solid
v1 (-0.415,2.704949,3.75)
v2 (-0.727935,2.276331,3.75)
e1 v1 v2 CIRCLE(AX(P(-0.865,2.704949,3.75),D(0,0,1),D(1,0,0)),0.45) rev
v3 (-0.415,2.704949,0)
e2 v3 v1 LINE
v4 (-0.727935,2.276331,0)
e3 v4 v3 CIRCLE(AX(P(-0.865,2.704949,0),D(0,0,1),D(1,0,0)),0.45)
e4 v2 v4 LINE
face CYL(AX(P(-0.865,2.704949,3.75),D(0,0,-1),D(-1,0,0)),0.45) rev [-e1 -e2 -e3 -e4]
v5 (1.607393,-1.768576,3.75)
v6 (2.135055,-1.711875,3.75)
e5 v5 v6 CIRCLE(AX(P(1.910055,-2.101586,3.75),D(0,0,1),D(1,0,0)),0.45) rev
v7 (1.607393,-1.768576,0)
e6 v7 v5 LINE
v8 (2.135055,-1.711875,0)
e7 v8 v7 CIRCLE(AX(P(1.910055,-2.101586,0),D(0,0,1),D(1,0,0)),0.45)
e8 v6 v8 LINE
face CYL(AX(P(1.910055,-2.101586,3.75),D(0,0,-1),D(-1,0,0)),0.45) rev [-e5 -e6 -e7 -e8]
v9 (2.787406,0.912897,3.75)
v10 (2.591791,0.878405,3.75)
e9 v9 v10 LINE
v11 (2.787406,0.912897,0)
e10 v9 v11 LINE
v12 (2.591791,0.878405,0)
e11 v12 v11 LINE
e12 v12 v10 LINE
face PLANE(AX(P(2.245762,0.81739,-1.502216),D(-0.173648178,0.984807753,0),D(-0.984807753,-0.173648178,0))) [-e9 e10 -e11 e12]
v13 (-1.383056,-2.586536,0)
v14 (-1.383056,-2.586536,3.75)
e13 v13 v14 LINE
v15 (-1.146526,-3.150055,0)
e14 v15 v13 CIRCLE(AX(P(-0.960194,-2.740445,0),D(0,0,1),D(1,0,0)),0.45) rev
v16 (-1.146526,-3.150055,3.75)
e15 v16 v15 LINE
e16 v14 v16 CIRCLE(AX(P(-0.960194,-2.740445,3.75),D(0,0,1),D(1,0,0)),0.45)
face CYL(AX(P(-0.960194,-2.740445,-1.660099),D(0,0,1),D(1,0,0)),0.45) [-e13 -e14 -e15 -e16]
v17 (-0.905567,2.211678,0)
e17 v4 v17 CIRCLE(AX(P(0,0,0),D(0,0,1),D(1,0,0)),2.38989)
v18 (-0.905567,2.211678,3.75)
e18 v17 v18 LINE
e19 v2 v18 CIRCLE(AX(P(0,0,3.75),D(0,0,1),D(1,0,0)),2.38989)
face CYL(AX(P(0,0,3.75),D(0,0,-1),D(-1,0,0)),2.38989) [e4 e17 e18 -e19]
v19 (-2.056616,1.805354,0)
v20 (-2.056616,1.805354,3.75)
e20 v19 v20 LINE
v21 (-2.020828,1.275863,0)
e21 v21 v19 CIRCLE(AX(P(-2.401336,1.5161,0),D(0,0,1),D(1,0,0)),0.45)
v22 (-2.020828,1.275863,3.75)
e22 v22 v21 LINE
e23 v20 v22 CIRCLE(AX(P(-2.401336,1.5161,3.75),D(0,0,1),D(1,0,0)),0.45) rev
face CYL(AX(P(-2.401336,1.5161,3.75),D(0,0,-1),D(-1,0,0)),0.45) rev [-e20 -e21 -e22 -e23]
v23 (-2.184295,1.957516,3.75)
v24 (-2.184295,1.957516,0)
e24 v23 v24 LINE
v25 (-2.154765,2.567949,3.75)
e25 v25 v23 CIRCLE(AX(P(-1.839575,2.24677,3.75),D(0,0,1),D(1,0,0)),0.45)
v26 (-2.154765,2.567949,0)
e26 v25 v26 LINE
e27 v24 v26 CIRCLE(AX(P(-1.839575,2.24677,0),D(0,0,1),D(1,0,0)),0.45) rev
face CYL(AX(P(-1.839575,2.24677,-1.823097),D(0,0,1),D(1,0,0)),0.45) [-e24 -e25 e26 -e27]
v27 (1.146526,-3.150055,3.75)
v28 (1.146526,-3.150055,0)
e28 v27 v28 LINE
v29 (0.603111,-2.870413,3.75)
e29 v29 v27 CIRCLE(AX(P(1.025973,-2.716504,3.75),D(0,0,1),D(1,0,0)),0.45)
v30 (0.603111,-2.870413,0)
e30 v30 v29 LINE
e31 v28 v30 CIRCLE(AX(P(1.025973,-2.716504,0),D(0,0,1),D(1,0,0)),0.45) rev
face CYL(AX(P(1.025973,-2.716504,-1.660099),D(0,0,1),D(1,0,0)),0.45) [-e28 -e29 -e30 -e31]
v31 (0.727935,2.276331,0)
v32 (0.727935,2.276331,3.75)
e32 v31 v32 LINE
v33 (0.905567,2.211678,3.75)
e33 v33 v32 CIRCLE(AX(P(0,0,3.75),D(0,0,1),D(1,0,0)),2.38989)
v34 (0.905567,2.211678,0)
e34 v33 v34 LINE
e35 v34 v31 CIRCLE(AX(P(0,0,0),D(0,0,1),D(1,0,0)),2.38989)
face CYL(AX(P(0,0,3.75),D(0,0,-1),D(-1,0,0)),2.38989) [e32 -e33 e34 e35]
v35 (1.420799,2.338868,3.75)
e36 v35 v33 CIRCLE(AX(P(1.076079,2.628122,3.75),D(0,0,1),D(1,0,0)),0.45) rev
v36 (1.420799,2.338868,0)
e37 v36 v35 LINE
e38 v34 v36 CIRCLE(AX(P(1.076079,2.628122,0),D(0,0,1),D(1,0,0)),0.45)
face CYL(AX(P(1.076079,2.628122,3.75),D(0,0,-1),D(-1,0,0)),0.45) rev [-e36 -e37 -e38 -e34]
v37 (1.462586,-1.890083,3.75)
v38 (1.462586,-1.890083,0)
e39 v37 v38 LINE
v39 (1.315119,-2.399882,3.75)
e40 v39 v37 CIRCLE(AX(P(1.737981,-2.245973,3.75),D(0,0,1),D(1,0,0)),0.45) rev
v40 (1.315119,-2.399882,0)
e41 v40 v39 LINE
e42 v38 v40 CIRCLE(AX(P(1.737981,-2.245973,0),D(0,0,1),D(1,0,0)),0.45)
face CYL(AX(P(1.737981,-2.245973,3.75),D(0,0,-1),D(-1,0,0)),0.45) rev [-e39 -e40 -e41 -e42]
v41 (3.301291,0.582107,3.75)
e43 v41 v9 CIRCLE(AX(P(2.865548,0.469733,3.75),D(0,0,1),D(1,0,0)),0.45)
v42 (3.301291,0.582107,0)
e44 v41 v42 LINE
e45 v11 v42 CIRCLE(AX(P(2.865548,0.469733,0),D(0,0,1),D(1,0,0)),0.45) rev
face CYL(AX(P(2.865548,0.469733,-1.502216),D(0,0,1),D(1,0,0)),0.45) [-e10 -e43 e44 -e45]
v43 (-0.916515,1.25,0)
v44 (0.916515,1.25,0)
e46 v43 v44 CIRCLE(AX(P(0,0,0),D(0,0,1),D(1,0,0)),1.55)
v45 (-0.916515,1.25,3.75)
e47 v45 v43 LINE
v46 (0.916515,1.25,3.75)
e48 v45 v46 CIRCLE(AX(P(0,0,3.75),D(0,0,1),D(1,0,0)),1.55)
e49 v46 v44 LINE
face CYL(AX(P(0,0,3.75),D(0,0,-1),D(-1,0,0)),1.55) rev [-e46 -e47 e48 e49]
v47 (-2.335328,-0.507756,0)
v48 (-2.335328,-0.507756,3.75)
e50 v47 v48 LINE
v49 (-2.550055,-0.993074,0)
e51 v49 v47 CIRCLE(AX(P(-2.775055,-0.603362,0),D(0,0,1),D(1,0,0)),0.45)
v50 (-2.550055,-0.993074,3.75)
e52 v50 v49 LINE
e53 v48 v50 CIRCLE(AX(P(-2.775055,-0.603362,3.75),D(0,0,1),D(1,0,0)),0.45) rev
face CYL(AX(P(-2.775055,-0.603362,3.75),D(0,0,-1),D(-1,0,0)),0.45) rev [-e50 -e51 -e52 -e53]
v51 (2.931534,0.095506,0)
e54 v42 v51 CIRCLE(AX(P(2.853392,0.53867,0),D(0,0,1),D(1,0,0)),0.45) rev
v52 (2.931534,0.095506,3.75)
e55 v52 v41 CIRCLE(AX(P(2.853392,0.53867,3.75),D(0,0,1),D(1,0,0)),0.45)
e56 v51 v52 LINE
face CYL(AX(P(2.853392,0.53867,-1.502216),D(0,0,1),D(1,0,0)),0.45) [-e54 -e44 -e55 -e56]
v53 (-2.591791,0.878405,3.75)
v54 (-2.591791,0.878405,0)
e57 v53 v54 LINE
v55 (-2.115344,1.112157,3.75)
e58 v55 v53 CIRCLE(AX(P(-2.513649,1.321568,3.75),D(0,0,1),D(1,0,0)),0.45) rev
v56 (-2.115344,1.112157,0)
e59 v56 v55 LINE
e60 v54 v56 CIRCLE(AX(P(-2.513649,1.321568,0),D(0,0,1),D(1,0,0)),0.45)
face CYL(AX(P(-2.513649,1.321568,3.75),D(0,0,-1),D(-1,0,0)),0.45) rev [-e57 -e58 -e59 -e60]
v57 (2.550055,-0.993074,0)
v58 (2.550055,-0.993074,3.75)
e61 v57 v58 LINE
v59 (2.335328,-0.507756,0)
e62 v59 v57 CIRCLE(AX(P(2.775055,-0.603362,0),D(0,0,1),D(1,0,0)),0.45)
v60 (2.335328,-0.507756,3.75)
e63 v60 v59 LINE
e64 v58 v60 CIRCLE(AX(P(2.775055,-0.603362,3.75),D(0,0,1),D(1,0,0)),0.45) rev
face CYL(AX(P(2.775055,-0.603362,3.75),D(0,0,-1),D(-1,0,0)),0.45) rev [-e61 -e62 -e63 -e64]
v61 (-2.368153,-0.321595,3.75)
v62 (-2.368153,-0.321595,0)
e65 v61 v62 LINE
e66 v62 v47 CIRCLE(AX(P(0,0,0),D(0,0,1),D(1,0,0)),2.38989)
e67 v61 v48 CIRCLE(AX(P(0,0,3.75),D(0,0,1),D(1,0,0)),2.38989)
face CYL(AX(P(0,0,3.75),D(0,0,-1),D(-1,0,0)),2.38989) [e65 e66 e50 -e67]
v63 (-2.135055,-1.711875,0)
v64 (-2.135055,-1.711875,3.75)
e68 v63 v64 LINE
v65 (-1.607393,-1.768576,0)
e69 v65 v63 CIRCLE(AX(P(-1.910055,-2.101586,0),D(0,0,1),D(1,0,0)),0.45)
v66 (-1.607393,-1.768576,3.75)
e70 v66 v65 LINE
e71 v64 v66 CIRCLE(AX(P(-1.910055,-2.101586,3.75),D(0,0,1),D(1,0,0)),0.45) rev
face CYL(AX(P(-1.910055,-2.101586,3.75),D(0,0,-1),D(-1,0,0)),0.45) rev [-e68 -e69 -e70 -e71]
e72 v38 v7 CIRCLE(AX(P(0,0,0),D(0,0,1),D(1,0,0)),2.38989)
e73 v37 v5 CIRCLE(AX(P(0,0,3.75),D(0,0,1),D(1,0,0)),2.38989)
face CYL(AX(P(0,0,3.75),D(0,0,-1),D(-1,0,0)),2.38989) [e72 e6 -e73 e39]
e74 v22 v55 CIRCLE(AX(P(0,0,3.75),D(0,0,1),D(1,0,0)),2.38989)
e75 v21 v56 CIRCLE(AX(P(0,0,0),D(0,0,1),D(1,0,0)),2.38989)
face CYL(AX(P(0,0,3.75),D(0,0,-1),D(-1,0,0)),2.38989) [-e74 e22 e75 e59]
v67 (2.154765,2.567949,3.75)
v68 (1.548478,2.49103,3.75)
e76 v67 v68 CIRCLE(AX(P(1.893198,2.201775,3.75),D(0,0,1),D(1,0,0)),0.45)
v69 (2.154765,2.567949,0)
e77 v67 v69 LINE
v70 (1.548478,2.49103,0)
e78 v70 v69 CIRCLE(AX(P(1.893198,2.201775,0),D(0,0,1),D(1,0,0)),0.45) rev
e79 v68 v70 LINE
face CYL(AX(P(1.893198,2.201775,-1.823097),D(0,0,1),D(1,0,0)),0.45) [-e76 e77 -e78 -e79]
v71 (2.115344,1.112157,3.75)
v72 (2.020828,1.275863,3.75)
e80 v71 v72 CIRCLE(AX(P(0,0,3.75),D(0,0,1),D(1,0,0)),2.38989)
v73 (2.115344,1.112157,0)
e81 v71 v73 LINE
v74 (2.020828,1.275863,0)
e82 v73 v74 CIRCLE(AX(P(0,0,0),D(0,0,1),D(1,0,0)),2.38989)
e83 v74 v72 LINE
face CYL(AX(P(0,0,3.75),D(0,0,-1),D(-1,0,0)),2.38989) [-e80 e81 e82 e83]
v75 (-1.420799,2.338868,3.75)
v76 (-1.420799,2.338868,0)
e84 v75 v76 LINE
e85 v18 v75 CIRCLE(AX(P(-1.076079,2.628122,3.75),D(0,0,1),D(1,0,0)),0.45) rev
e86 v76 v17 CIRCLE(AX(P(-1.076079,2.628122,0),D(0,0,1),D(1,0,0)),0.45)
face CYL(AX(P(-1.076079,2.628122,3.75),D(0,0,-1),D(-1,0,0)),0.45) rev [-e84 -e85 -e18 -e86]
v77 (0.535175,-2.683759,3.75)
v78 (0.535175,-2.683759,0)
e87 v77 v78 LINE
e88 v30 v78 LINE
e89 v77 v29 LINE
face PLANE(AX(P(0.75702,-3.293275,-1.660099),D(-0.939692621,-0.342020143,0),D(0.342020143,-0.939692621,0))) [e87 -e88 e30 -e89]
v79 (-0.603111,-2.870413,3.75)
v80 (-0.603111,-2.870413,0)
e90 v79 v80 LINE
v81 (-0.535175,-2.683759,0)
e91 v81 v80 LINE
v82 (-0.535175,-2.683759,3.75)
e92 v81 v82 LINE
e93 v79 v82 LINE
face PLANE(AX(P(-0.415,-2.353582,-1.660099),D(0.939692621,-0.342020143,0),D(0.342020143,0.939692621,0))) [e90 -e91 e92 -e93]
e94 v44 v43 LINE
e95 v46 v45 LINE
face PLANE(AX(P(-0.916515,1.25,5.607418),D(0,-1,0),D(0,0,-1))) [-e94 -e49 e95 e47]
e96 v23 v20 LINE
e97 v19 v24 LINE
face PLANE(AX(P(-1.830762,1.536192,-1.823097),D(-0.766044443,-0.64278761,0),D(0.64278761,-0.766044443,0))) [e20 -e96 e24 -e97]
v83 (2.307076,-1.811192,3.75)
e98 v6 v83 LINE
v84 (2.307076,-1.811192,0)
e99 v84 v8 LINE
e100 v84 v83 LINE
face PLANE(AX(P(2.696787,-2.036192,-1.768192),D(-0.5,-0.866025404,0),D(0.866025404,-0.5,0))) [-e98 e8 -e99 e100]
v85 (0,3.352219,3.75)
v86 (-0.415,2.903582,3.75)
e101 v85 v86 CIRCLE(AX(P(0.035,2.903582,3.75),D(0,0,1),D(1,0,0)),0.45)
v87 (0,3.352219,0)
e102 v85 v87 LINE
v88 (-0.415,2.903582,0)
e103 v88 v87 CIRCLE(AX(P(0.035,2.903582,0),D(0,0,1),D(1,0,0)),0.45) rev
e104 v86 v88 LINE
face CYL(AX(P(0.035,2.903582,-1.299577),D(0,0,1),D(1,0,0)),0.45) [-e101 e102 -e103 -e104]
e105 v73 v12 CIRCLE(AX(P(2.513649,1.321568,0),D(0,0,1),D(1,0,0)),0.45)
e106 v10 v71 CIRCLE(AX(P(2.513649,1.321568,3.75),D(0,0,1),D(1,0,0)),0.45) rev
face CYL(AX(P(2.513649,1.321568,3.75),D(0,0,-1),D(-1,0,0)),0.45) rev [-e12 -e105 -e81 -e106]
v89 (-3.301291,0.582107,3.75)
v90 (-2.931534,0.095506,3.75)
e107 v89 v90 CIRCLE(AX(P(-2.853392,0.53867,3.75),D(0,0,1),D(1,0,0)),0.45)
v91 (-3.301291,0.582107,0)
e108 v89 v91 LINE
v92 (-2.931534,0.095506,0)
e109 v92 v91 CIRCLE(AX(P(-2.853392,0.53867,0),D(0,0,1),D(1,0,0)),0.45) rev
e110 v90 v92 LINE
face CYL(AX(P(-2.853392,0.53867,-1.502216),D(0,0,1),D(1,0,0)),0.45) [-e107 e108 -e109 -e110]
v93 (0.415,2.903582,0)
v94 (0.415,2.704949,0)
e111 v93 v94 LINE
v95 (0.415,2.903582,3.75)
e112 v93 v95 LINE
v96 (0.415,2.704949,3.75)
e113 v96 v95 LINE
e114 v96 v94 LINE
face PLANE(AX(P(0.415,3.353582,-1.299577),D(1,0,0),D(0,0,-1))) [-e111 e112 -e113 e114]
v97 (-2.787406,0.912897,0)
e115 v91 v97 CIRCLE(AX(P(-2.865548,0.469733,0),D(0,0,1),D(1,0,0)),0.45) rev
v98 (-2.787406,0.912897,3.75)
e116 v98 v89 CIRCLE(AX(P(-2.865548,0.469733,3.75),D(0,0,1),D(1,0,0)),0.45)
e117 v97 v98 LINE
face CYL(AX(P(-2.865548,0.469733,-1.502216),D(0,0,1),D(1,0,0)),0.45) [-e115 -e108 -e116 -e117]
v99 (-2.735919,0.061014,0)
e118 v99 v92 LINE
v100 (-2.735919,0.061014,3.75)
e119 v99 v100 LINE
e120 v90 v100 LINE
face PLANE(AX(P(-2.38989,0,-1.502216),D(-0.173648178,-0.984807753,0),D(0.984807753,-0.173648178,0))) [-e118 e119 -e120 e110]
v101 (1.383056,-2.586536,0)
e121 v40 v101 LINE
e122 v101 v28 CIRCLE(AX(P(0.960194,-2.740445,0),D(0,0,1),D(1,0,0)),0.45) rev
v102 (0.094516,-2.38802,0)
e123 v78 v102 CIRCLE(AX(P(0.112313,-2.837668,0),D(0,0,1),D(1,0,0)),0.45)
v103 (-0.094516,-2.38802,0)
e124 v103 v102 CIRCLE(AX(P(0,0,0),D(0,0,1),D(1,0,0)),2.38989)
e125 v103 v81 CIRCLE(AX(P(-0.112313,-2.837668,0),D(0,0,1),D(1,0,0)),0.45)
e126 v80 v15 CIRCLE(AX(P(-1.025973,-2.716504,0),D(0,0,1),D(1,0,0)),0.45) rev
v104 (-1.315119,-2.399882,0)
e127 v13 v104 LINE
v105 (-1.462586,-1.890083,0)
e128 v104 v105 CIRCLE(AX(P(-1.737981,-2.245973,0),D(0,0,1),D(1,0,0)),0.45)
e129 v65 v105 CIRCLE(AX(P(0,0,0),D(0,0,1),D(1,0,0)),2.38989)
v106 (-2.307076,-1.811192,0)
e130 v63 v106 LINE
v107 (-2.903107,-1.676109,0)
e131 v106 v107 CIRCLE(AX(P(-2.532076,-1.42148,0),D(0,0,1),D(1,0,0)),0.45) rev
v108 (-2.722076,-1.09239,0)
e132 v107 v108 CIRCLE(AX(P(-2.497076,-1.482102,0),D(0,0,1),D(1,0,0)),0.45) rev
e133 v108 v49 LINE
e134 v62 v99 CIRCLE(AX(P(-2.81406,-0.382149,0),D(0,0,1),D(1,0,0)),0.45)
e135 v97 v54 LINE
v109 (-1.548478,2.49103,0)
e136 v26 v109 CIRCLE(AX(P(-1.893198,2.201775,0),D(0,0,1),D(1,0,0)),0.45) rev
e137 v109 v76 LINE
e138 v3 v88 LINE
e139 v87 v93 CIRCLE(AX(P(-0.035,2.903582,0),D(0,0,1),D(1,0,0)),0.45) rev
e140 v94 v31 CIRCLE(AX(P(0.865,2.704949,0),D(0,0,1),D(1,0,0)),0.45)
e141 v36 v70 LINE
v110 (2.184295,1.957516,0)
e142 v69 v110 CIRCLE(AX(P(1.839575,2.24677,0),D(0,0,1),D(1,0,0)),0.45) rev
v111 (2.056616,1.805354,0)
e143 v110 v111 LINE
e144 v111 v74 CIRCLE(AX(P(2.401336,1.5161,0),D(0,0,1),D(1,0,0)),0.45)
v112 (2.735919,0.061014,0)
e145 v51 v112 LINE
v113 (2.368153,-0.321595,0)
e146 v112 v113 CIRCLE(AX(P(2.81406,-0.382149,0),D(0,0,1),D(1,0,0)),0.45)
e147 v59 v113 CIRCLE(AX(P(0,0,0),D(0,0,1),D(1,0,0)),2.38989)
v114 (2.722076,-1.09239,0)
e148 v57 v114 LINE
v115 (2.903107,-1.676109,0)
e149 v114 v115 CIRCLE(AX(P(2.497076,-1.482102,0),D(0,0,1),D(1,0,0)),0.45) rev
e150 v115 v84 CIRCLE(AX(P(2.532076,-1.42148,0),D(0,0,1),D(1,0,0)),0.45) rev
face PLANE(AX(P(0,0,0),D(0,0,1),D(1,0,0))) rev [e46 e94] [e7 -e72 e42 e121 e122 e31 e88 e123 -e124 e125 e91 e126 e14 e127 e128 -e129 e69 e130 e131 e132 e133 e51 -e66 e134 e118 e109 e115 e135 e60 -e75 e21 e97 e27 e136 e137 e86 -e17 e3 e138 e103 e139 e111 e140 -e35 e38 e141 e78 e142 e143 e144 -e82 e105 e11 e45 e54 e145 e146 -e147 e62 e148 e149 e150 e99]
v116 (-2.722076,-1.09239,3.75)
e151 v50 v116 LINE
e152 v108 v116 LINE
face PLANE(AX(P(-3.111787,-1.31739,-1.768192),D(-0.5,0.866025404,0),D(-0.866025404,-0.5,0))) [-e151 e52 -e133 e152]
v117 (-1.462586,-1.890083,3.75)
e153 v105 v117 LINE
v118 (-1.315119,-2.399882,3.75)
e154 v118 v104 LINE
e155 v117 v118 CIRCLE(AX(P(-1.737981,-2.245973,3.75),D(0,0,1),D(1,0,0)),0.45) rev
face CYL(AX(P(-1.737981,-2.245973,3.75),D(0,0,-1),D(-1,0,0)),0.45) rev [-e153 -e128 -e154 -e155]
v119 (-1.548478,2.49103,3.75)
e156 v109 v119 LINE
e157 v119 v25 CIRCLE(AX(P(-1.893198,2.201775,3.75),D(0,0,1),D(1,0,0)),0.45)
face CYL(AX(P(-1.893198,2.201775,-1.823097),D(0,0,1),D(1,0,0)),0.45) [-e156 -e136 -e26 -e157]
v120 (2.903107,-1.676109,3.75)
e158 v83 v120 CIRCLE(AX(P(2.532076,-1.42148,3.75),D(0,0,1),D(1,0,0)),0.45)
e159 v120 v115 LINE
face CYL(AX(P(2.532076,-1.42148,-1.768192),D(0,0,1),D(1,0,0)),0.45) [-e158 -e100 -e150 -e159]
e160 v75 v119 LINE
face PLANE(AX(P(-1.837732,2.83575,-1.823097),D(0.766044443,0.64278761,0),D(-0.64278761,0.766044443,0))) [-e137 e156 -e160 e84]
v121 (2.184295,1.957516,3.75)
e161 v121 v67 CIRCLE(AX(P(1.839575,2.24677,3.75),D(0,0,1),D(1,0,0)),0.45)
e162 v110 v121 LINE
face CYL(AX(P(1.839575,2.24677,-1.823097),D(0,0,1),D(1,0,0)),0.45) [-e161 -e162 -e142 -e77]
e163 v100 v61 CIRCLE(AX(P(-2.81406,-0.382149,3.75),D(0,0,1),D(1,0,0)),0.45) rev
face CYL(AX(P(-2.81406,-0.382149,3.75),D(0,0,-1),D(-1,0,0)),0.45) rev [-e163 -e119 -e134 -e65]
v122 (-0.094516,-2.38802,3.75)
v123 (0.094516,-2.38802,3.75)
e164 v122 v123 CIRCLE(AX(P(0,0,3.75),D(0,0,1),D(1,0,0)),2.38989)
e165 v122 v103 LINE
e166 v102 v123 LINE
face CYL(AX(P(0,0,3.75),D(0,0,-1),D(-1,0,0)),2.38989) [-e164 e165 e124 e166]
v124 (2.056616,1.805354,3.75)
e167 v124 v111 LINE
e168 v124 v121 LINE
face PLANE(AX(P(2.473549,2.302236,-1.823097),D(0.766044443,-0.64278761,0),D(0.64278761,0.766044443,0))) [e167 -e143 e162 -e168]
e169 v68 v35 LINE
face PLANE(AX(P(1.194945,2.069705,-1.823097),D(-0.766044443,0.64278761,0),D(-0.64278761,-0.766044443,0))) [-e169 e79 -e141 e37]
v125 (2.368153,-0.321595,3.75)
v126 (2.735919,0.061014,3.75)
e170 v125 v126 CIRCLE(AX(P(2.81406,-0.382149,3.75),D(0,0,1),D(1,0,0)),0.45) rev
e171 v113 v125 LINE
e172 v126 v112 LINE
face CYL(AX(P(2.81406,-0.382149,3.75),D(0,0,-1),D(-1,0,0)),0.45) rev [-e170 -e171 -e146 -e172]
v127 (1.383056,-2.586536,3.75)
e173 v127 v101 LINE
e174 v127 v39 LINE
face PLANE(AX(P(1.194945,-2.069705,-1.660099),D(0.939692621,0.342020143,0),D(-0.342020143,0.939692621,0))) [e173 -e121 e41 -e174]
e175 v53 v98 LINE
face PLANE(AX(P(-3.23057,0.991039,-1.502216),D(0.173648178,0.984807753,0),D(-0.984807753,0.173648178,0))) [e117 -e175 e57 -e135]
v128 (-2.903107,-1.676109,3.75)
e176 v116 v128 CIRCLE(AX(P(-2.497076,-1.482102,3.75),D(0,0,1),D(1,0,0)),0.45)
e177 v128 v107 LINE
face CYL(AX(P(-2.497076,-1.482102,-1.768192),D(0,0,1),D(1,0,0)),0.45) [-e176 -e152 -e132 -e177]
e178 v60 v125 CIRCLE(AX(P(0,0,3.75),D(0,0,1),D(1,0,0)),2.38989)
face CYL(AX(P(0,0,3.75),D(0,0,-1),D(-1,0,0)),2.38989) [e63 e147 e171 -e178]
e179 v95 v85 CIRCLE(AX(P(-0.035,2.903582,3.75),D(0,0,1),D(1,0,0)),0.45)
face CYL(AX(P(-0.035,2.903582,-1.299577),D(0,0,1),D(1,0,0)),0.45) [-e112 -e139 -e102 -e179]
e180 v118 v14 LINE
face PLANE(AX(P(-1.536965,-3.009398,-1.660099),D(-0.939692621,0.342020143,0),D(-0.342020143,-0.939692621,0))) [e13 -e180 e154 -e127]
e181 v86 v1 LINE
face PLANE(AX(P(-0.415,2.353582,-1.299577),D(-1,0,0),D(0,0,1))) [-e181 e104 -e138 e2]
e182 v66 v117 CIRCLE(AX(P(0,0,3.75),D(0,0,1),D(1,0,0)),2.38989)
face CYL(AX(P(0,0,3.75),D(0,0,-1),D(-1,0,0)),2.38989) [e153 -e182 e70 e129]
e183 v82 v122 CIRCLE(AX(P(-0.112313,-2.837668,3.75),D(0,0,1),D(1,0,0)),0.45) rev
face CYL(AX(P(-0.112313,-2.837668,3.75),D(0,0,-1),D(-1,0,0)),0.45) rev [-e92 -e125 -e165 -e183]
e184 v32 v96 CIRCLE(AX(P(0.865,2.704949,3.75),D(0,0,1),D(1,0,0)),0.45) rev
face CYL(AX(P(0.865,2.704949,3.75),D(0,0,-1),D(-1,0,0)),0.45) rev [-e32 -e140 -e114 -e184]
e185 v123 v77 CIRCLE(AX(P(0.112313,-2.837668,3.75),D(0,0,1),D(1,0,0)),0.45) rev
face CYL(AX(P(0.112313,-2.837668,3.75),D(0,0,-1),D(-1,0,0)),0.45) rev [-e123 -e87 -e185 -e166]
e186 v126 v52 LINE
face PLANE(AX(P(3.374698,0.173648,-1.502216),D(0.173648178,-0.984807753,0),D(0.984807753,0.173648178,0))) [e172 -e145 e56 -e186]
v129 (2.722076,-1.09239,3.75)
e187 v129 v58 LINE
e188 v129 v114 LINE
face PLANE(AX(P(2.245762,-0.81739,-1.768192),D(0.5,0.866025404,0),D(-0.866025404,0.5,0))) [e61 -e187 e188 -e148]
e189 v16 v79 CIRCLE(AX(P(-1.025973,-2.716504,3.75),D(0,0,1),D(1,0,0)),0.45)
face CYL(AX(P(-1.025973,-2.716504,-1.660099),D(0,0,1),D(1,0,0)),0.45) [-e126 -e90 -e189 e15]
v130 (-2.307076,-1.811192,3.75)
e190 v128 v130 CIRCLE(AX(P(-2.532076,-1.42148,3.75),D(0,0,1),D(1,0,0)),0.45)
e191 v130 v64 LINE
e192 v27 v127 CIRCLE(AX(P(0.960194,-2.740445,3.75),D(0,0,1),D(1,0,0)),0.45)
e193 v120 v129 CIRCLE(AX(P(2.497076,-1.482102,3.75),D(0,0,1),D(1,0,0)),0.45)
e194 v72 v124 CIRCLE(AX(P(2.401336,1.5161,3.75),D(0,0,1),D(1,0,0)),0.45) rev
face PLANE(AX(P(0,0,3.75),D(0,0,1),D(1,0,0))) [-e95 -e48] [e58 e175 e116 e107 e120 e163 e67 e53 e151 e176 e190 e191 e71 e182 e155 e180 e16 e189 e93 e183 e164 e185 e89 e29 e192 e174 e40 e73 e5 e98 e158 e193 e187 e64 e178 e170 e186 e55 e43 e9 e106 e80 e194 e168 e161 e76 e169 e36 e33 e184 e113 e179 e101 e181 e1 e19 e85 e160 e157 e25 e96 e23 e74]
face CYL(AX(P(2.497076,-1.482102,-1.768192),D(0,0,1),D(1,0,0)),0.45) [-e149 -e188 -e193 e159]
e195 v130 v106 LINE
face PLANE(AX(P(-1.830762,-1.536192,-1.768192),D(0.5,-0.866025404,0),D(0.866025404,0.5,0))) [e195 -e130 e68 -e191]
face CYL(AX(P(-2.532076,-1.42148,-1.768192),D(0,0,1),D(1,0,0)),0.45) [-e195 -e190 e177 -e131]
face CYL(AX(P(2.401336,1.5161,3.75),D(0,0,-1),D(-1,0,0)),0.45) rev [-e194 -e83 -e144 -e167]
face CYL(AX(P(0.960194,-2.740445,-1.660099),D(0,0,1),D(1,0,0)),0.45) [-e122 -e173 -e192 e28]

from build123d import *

# Parameters (mm, degrees)
SKETCH1_R                = 2.389889751
SKETCH1_R_2              = 1.55
BOSS_EXTRUDE1_DEPTH      = 3.75
SKETCH2_W                = 0.83
SKETCH2_H                = 1
BOSS_EXTRUDE2_DEPTH      = 3.75
FILLET1_R                = 0.45
CIRPATTERN1_COUNT        = 9
FILLET1_OF_CIRPATTERN1_R = 0.45
SKETCH3_W                = 1.833030278
SKETCH3_H                = 0.3
BOSS_EXTRUDE3_DEPTH      = 3.75


with BuildPart() as part:
    # Sketch1 → Boss-Extrude1 (new body)
    with BuildSketch(Plane.XY):
        Circle(SKETCH1_R)
        Circle(SKETCH1_R_2, mode=Mode.SUBTRACT)
    extrude(amount=BOSS_EXTRUDE1_DEPTH)

    # Sketch2 → Boss-Extrude2 (add)
    with BuildSketch(Plane.XY.offset(3.75)):
        with Locations((0, 2.853581955)):
            Rectangle(SKETCH2_W, SKETCH2_H)
    boss_extrude2 = extrude(amount=-BOSS_EXTRUDE2_DEPTH)

    # Fillet1
    # the kernel refuses this fillet: 0.45 mm, written as the material it adds along each edge
    with BuildSketch(Plane(origin=(-0.415, 2.353581955, 3.75), x_dir=(-0.970855819199755, -0.2396643034036823, 0), z_dir=(0, 0, -1))) as fillet1_piece_1:
        with BuildLine():
            CenterArc((0.352674994, 0.448975623), FILLET1_R, 193.866728132, 72.266543736)
            Line((-0.084210125, 0.341126687), (0, 0))
            ThreePointArc((0, 0), (0.161164415, 0.005440327), (0.32232883, 0))
        make_face()
    extrude(amount=3.75)
    with BuildSketch(Plane(origin=(0.415, 2.353581955, 3.75), x_dir=(0.9708558191997549, -0.2396643034036833, 0), z_dir=(0, 0, -1))) as fillet1_piece_2:
        with BuildLine():
            CenterArc((0.352674994, -0.448975623), FILLET1_R, 93.866728132, 72.266543736)
            Line((-0.084210125, -0.341126687), (0, 0))
            ThreePointArc((0, 0), (0.161164415, -0.005440327), (0.32232883, 0))
        make_face()
    extrude(amount=3.75)
    # the kernel refuses this fillet: 0.45 mm, written as the material it takes off along each edge
    with BuildSketch(Plane(origin=(-0.415, 3.353581955, 4.875), x_dir=(1, 0, 0), z_dir=(0, 0, -1)), Plane(origin=(0.415, 3.353581955, 4.875), x_dir=(0, -1, 0), z_dir=(0, 0, -1))) as fillet1_2_piece_1:
        with BuildLine():
            CenterArc((FILLET1_R, FILLET1_R), FILLET1_R, 180, 90)
            Line((0, FILLET1_R), (0, 0))
            Line((0, 0), (FILLET1_R, 0))
        make_face()
    extrude(amount=6, mode=Mode.SUBTRACT)

    # CirPattern1: Boss-Extrude2 ×9 about axis
    cirpattern1_axis = Axis((0, 0, 0), (0, 0, 1))
    for i in range(1, CIRPATTERN1_COUNT):
        add(boss_extrude2.rotate(cirpattern1_axis, i * 360 / CIRPATTERN1_COUNT))

    # Fillet1 of CirPattern1
    # the kernel refuses this fillet: 0.45 mm, written as the material it adds along each edge
    with BuildSketch(Plane(origin=(-1.830761763, 1.53619152, 3.75), x_dir=(-0.5896654606556537, -0.8076475992100489, 0), z_dir=(0, 0, -1)), Plane(origin=(-2.389889751, 0, 3.75), x_dir=(0.06743592033084408, -0.9977236073428011, 0), z_dir=(0, 0, -1)), Plane(origin=(-1.830761763, -1.53619152, 3.75), x_dir=(0.6929832847277674, -0.7209536511370993, 0), z_dir=(0, 0, -1)), Plane(origin=(-0.415, -2.353581955, 3.75), x_dir=(0.994276068549242, -0.10684146905702349, 0), z_dir=(0, 0, -1)), Plane(origin=(1.194944875, -2.069705236, 3.75), x_dir=(0.8303360297488931, 0.5572630238054965, 0), z_dir=(0, 0, -1)), Plane(origin=(2.245761763, -0.817390435, 3.75), x_dir=(0.2778725344719876, 0.960617954540781, 0), z_dir=(0, 0, -1)), Plane(origin=(2.245761763, 0.817390435, 3.75), x_dir=(-0.4046106078935896, 0.9144890682670732, 0), z_dir=(0, 0, -1)), Plane(origin=(1.194944875, 2.069705236, 3.75), x_dir=(-0.8977719500797382, 0.44046058353730577, 0), z_dir=(0, 0, -1))) as fillet1_of_cirpattern1_piece_1:
        with BuildLine():
            CenterArc((0.352674994, 0.448975623), FILLET1_OF_CIRPATTERN1_R, 193.866728132, 72.266543736)
            Line((-0.084210125, 0.341126687), (0, 0))
            ThreePointArc((0, 0), (0.161164415, 0.005440327), (0.32232883, 0))
        make_face()
    extrude(amount=3.75)
    with BuildSketch(Plane(origin=(-1.194944875, 2.069705236, 3.75), x_dir=(-0.6427876096865393, 0.7660444431189779, 0), z_dir=(0, 0, -1)), Plane(origin=(-2.245761763, 0.817390435, 3.75), x_dir=(-0.9848077530122081, 0.17364817766693041, 0), z_dir=(0, 0, -1)), Plane(origin=(-2.245761763, -0.817390435, 3.75), x_dir=(-0.8660254037844392, -0.4999999999999993, 0), z_dir=(0, 0, -1)), Plane(origin=(-1.194944875, -2.069705236, 3.75), x_dir=(-0.34202014332566916, -0.9396926207859083, 0), z_dir=(0, 0, -1)), Plane(origin=(0.415, -2.353581955, 3.75), x_dir=(0.3420201433256687, -0.9396926207859083, 0), z_dir=(0, 0, -1)), Plane(origin=(1.830761763, -1.53619152, 3.75), x_dir=(0.8660254037844389, -0.49999999999999944, 0), z_dir=(0, 0, -1)), Plane(origin=(2.389889751, 0, 3.75), x_dir=(0.984807753012208, 0.1736481776669301, 0), z_dir=(0, 0, -1))) as fillet1_of_cirpattern1_piece_2:
        with BuildLine():
            CenterArc((0.35136699, 0.45), FILLET1_OF_CIRPATTERN1_R, 197.733456264, 72.266543736)
            ThreePointArc((-0.077250714, 0.31293482), (-0.033343584, 0.157771262), (0, 0))
            Line((0, 0), (0.35136699, 0))
        make_face()
    extrude(amount=3.75)
    with BuildSketch(Plane(origin=(1.830761763, 1.53619152, 3.75), x_dir=(0.5896654606556527, -0.8076475992100495, 0), z_dir=(0, 0, -1))) as fillet1_of_cirpattern1_piece_3:
        with BuildLine():
            CenterArc((0.352674994, -0.448975623), FILLET1_OF_CIRPATTERN1_R, 93.866728132, 72.266543736)
            Line((-0.084210125, -0.341126687), (0, 0))
            ThreePointArc((0, 0), (0.161164415, -0.005440327), (0.32232883, 0))
        make_face()
    extrude(amount=3.75)
    # the kernel refuses this fillet: 0.45 mm, written as the material it takes off along each edge
    with BuildSketch(Plane(origin=(-2.473549373, 2.302235963, 4.875), x_dir=(0.7660444431189787, 0.6427876096865386, 0), z_dir=(0, 0, -1)), Plane(origin=(-1.837732485, 2.835749679, 4.875), x_dir=(0.6427876096865393, -0.766044443118978, 0), z_dir=(0, 0, -1)), Plane(origin=(-3.374697504, 0.173648178, 4.875), x_dir=(0.17364817766693086, 0.984807753012208, 0), z_dir=(0, 0, -1)), Plane(origin=(-3.230569516, 0.991038613, 4.875), x_dir=(0.9848077530122081, -0.17364817766693022, 0), z_dir=(0, 0, -1)), Plane(origin=(-2.696787167, -2.03619152, 4.875), x_dir=(-0.5000000000000001, 0.8660254037844386, 0), z_dir=(0, 0, -1)), Plane(origin=(-3.111787167, -1.317390435, 4.875), x_dir=(0.8660254037844386, 0.5000000000000001, 0), z_dir=(0, 0, -1)), Plane(origin=(-0.757020143, -3.293274576, 4.875), x_dir=(-0.9396926207859084, 0.34202014332566855, 0), z_dir=(0, 0, -1)), Plane(origin=(-1.536965019, -3.009397857, 4.875), x_dir=(0.3420201433256694, 0.9396926207859081, 0), z_dir=(0, 0, -1)), Plane(origin=(1.536965019, -3.009397857, 4.875), x_dir=(-0.9396926207859084, -0.34202014332566855, 0), z_dir=(0, 0, -1)), Plane(origin=(0.757020143, -3.293274576, 4.875), x_dir=(-0.3420201433256689, 0.9396926207859084, 0), z_dir=(0, 0, -1)), Plane(origin=(3.111787167, -1.317390435, 4.875), x_dir=(-0.5000000000000004, -0.8660254037844384, 0), z_dir=(0, 0, -1)), Plane(origin=(2.696787167, -2.03619152, 4.875), x_dir=(-0.8660254037844384, 0.5000000000000004, 0), z_dir=(0, 0, -1)), Plane(origin=(3.230569516, 0.991038613, 4.875), x_dir=(0.17364817766692991, -0.9848077530122081, 0), z_dir=(0, 0, -1)), Plane(origin=(3.374697504, 0.173648178, 4.875), x_dir=(-0.9848077530122081, -0.17364817766692986, 0), z_dir=(0, 0, -1)), Plane(origin=(1.837732485, 2.835749679, 4.875), x_dir=(0.766044443118978, -0.6427876096865394, 0), z_dir=(0, 0, -1)), Plane(origin=(2.473549373, 2.302235963, 4.875), x_dir=(-0.6427876096865394, -0.766044443118978, 0), z_dir=(0, 0, -1))) as fillet1_of_cirpattern1_2_piece_1:
        with BuildLine():
            CenterArc((FILLET1_OF_CIRPATTERN1_R, FILLET1_OF_CIRPATTERN1_R), FILLET1_OF_CIRPATTERN1_R, 180, 90)
            Line((0, FILLET1_OF_CIRPATTERN1_R), (0, 0))
            Line((0, 0), (FILLET1_OF_CIRPATTERN1_R, 0))
        make_face()
    extrude(amount=6, mode=Mode.SUBTRACT)

    # Sketch3 → Boss-Extrude3 (add)
    with BuildSketch(Plane(origin=(0, 0, 0), x_dir=(-1, 0, 0), z_dir=(0, 0, -1))):
        with Locations((0, 1.4)):
            Rectangle(SKETCH3_W, SKETCH3_H)
    extrude(amount=-BOSS_EXTRUDE3_DEPTH)


solid = part.part
